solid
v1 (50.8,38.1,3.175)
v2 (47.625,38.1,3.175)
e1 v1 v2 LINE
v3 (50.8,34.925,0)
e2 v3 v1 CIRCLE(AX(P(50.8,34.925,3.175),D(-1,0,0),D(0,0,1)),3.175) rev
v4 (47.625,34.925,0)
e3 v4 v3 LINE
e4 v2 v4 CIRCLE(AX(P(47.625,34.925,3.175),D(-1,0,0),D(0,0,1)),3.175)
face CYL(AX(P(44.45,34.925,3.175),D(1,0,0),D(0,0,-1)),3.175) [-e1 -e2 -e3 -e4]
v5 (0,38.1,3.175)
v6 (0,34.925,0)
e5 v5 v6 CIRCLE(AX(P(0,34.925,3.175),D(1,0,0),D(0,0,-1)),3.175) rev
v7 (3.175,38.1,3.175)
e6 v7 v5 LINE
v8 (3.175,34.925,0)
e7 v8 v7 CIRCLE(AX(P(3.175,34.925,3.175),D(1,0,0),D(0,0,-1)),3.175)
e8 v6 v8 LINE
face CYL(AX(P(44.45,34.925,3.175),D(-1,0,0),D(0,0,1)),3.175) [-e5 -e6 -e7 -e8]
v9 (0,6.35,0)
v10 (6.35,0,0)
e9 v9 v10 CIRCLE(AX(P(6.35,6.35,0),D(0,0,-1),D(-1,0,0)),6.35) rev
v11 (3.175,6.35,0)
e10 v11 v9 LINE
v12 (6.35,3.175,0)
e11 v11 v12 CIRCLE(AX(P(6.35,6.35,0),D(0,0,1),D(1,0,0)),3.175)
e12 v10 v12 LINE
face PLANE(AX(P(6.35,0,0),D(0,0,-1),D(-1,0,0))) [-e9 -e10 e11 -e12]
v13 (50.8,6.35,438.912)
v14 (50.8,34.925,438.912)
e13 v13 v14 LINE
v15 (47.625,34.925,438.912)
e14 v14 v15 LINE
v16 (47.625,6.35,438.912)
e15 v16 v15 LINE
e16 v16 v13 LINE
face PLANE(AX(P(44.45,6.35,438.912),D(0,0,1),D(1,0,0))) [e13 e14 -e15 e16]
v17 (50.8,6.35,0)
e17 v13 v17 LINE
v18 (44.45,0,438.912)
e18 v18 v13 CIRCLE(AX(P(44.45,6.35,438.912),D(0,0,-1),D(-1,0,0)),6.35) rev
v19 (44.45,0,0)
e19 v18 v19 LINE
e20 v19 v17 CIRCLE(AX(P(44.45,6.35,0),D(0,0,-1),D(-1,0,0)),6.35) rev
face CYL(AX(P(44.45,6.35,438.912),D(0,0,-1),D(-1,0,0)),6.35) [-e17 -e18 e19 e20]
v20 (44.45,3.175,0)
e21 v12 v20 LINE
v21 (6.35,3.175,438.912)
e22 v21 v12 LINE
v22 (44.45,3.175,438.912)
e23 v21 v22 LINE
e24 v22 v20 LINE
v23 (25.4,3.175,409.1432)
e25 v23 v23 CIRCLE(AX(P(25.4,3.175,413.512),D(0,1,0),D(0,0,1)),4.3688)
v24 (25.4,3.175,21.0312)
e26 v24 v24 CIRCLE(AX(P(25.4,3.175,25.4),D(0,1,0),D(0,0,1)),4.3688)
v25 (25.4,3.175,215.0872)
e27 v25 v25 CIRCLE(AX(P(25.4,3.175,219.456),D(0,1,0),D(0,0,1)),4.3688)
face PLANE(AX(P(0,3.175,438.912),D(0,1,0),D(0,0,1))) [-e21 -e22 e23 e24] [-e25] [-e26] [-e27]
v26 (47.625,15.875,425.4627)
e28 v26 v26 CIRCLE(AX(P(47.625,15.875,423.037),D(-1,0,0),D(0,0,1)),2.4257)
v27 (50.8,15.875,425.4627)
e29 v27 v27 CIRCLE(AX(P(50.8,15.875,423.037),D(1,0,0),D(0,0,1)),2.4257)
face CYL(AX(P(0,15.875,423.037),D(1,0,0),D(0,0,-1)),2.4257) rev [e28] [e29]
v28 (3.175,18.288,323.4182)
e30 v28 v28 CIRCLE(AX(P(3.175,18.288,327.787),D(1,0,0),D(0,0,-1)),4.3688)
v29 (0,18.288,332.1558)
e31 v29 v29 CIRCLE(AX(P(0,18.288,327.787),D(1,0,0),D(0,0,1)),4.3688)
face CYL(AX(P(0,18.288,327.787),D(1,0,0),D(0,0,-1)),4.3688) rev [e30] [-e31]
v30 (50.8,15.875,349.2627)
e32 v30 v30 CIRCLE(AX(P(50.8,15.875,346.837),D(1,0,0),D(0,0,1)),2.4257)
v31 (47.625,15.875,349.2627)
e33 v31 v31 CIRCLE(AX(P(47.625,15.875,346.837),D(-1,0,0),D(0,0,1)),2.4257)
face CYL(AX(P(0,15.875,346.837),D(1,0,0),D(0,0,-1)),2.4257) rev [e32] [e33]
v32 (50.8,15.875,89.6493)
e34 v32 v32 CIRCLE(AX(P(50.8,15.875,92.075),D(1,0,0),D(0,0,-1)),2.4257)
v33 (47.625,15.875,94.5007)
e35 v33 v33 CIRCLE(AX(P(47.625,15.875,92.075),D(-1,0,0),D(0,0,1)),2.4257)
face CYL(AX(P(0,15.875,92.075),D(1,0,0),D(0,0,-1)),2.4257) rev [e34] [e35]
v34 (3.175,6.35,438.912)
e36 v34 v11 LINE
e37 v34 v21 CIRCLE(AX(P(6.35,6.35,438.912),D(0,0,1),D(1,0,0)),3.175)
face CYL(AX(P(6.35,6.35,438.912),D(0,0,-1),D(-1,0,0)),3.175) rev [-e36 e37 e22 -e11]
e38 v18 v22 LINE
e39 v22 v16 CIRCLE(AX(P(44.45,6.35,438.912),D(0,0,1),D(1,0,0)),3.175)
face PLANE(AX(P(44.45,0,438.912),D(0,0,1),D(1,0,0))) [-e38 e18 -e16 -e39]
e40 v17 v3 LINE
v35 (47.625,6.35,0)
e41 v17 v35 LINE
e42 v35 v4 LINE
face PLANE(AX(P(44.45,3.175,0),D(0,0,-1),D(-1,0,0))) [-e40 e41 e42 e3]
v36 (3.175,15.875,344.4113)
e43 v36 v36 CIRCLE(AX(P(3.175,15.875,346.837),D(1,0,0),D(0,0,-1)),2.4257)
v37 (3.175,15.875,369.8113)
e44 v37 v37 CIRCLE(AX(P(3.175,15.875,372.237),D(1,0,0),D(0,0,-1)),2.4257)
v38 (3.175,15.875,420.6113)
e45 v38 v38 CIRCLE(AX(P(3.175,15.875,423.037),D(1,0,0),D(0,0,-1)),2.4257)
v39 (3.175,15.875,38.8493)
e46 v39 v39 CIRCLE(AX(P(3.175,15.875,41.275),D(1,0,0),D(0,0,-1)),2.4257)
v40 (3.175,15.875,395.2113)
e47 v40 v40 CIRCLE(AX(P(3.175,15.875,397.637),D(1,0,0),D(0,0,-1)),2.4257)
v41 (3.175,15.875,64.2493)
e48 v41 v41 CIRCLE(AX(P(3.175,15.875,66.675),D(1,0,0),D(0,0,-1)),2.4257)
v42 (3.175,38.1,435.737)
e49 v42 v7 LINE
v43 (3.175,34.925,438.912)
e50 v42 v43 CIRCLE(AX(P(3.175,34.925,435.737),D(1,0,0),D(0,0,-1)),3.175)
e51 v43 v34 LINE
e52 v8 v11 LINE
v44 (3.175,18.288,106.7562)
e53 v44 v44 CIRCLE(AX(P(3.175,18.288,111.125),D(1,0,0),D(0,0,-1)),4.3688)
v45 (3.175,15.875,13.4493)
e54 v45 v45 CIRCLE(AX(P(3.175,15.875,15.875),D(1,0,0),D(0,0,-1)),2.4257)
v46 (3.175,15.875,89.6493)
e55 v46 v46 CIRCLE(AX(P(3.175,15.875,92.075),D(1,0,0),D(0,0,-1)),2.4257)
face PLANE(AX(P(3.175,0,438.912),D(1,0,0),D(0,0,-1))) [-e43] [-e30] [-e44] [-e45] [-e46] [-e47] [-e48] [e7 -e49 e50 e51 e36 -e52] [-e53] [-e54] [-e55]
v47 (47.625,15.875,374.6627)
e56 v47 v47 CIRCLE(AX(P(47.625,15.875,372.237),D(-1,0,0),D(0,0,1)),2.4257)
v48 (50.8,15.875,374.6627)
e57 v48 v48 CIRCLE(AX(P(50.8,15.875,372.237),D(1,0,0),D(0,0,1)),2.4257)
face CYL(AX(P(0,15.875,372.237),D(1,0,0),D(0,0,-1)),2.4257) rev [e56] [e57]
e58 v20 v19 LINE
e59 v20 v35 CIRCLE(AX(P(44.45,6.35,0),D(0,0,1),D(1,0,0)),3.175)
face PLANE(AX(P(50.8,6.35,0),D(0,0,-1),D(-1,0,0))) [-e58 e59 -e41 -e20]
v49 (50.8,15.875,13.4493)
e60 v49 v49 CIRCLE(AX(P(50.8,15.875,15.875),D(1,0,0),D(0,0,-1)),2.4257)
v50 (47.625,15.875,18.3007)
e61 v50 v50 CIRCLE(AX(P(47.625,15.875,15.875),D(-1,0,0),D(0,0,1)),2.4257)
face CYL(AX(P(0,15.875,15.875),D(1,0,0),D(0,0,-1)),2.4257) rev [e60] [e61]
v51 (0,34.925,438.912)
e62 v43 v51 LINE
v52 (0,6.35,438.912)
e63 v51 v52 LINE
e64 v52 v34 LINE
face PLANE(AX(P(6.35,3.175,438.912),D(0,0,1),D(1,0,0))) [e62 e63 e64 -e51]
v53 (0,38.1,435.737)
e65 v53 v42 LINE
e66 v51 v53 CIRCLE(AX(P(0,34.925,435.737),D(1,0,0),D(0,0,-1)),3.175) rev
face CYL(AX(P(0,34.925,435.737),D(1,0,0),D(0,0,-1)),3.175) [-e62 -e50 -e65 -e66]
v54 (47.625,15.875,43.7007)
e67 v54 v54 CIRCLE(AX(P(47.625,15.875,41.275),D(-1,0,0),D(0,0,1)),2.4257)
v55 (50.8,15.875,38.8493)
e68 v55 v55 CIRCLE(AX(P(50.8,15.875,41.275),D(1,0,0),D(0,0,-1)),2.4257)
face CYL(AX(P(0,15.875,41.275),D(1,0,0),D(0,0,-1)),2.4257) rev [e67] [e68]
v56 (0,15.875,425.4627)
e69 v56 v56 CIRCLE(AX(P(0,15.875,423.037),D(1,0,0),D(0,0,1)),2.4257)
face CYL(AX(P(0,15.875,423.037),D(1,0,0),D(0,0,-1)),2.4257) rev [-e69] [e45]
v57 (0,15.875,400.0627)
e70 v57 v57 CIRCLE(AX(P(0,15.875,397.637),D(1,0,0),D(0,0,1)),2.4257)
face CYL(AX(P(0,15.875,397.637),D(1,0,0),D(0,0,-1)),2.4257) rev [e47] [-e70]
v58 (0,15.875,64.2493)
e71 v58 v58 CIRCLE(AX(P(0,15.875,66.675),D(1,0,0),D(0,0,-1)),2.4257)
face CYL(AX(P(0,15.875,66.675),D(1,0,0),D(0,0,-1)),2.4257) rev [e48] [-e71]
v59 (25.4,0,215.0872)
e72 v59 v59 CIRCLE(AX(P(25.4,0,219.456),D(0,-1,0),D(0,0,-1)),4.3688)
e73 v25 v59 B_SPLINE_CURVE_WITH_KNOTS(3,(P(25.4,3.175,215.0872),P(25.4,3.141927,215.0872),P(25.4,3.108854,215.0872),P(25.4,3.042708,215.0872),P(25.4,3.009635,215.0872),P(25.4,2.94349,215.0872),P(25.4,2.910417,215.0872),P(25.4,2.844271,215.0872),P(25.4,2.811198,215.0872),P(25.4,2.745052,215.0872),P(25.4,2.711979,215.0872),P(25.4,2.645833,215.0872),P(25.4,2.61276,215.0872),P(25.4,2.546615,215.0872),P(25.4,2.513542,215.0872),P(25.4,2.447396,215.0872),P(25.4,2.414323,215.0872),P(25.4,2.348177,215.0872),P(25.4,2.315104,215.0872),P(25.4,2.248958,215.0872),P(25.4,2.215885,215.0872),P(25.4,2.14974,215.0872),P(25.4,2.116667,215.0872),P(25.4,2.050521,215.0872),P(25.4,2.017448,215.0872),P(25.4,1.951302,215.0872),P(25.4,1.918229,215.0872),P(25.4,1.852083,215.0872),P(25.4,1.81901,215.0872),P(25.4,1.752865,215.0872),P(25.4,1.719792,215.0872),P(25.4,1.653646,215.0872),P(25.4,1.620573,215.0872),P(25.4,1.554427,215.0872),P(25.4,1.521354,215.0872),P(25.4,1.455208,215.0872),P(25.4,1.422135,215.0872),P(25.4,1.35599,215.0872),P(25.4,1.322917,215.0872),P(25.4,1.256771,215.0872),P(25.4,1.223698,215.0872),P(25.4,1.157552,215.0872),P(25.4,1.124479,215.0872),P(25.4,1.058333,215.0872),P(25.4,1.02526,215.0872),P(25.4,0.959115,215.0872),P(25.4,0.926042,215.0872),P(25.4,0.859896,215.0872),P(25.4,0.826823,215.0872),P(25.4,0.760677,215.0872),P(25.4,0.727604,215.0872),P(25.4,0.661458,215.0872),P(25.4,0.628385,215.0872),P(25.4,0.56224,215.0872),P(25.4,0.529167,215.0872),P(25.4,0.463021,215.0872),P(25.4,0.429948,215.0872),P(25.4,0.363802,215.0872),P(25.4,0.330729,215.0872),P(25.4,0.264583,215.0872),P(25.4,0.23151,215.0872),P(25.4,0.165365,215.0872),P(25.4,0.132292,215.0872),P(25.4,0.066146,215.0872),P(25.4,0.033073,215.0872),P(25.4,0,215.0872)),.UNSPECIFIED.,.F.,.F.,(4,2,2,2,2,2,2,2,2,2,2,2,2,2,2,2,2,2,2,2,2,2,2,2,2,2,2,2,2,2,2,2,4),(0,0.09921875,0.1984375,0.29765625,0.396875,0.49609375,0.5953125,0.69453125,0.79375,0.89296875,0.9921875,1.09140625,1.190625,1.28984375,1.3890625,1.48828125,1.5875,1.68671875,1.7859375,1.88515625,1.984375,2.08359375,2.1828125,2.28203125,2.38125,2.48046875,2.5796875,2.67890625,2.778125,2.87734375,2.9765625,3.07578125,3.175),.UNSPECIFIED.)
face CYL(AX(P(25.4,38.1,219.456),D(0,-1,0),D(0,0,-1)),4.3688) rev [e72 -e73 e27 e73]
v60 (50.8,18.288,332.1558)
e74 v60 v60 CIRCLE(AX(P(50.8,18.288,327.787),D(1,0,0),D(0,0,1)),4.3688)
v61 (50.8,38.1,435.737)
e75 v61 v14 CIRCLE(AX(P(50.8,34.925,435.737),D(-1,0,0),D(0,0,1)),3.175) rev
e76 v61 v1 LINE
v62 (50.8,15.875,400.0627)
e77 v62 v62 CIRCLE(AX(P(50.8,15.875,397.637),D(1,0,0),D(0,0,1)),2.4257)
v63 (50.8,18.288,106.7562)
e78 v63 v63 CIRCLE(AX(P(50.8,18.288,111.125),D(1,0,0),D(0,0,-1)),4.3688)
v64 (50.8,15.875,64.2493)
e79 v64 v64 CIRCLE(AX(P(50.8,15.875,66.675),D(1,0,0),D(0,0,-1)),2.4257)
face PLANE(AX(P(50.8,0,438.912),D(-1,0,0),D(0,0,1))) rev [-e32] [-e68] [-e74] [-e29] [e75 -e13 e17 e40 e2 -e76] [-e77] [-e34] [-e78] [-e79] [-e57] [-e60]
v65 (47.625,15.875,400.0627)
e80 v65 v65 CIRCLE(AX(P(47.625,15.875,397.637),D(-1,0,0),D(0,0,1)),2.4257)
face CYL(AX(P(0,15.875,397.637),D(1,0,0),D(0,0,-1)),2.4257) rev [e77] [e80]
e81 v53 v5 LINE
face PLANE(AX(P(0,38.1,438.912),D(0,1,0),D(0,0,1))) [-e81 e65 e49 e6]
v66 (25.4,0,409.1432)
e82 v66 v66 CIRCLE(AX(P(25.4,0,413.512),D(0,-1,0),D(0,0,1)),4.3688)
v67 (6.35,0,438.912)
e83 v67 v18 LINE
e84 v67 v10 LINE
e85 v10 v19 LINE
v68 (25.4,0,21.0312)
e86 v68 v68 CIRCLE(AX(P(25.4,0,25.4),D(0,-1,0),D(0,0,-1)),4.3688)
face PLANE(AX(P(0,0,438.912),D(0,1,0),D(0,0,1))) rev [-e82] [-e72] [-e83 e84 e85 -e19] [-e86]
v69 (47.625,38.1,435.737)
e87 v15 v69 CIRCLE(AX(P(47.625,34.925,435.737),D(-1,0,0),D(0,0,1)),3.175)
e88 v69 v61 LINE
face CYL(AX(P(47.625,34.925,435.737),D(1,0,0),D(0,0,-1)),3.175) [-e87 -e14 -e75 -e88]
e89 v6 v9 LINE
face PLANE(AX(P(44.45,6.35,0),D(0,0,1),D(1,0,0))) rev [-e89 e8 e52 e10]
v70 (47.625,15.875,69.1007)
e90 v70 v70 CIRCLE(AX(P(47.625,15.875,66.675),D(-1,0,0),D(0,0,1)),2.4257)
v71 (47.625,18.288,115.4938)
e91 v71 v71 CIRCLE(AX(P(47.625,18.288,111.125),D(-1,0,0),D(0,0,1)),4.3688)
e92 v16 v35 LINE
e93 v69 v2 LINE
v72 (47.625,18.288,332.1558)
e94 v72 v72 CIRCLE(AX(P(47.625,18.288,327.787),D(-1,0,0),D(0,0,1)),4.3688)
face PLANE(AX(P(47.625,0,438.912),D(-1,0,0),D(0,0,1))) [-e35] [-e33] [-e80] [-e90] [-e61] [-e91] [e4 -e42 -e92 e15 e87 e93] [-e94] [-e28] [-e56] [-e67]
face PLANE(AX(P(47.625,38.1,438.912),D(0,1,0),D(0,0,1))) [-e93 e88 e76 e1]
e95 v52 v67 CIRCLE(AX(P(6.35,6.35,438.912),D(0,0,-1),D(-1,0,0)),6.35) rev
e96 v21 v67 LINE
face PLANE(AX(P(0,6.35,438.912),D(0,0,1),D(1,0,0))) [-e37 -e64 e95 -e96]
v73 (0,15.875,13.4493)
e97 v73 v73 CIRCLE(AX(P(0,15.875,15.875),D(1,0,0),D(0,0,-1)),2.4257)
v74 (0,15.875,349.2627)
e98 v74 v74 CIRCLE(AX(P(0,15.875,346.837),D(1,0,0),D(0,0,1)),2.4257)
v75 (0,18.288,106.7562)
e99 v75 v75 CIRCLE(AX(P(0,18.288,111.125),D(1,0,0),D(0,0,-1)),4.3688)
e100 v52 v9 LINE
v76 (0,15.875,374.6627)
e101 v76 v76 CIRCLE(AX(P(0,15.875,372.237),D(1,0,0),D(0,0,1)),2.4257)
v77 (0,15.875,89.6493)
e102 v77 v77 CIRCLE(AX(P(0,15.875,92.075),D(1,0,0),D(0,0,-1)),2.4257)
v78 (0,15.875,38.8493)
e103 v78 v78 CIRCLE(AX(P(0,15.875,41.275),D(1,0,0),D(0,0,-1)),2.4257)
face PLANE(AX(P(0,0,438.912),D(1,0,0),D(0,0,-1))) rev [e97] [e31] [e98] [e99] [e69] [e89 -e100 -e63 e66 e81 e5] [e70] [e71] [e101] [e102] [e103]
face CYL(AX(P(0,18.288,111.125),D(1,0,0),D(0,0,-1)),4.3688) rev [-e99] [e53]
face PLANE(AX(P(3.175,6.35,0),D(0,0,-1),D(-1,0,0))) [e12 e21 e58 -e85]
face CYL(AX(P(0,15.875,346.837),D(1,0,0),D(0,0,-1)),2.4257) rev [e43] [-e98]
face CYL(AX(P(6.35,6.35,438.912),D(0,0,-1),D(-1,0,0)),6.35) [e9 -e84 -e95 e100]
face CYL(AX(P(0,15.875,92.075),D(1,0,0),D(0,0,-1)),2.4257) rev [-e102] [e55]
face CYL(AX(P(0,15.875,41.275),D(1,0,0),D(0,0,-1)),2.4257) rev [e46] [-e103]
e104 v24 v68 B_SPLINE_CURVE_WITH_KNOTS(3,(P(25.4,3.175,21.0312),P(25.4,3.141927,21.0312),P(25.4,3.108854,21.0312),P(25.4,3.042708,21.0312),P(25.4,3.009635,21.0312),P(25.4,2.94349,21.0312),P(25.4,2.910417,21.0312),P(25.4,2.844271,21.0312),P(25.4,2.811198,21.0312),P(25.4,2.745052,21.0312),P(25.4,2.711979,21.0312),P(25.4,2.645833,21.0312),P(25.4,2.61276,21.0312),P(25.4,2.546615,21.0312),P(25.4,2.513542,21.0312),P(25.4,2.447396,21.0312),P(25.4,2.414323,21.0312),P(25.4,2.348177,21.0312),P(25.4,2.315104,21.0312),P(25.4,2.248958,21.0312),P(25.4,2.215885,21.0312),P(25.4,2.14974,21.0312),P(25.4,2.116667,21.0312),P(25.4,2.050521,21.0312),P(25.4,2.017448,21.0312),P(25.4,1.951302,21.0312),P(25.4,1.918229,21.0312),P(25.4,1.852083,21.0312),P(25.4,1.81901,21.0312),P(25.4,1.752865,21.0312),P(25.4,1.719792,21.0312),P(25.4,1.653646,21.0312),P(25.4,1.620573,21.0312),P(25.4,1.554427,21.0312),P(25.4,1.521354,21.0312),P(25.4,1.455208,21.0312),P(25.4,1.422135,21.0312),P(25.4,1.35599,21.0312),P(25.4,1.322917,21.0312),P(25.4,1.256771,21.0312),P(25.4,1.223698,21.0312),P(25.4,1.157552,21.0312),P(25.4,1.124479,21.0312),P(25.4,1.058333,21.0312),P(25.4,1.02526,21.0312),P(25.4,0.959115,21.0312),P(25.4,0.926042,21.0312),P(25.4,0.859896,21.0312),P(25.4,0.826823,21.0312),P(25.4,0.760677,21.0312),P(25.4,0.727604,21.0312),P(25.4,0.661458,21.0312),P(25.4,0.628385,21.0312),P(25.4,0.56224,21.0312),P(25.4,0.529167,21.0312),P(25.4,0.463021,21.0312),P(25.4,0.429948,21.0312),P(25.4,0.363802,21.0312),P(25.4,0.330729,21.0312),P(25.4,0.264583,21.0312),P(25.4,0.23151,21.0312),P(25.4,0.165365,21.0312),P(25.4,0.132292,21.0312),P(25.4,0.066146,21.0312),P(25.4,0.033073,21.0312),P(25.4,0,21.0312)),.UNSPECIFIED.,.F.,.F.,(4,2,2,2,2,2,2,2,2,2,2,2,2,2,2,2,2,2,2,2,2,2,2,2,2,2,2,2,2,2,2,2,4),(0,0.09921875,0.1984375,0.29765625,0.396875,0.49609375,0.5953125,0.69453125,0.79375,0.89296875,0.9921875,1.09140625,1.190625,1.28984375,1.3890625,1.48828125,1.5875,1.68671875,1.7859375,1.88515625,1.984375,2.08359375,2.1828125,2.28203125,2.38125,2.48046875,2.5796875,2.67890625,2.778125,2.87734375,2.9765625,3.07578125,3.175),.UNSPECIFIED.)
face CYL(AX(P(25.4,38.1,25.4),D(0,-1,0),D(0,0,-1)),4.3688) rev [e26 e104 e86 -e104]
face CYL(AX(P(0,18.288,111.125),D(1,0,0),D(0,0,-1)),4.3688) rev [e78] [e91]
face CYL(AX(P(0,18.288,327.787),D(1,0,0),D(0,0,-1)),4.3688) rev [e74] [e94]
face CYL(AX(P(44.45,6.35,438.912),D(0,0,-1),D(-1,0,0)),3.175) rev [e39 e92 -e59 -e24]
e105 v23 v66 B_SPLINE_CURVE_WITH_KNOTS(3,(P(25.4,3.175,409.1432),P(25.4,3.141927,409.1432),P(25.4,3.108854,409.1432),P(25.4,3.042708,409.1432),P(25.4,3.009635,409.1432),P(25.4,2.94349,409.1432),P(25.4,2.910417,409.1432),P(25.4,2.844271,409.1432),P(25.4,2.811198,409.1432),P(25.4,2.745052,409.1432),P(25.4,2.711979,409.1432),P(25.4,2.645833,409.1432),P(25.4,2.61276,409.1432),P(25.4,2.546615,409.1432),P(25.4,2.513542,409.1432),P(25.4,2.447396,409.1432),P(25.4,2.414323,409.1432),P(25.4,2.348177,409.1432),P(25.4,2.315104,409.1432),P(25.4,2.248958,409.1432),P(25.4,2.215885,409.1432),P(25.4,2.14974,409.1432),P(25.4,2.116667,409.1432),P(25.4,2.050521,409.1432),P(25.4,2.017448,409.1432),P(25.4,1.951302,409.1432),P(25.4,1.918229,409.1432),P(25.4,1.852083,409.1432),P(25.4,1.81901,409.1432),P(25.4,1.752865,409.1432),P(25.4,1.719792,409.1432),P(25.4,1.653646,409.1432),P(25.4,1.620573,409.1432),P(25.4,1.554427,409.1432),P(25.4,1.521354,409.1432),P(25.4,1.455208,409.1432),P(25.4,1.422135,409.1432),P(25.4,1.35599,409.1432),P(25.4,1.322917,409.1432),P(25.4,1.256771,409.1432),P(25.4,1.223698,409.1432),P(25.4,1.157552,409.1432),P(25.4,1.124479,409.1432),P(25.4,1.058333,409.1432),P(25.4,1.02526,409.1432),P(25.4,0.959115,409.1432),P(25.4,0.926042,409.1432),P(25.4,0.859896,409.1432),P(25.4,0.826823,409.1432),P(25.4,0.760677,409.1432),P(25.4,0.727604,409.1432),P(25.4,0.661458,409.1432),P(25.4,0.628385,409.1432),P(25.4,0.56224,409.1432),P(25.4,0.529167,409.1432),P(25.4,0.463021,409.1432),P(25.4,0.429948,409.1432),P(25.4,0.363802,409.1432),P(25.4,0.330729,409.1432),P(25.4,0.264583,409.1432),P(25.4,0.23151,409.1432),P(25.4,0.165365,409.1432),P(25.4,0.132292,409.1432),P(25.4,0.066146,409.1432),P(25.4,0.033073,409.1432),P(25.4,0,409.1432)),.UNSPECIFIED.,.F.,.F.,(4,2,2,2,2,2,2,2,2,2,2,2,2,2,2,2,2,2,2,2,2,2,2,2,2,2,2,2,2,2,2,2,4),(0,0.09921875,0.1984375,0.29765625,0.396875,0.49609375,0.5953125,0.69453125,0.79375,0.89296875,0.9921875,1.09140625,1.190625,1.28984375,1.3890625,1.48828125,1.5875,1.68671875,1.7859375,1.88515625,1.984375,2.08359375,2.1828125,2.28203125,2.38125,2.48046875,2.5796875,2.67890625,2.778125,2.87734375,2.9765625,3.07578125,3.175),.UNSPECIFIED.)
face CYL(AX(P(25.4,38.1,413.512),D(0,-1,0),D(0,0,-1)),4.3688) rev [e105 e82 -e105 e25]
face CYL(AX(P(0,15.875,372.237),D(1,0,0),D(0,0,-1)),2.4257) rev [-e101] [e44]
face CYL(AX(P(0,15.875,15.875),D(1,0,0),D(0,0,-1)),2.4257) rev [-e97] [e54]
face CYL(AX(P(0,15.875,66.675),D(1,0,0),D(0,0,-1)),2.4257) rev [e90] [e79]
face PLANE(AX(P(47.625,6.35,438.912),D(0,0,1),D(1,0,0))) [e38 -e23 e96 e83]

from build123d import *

# Parameters (mm, degrees)
BASE_FLANGE1_DEPTH = 438.912
SKETCH6_R          = 2.4257
CUT_EXTRUDE1_DEPTH = 444.481672388
SKETCH7_R          = 4.3688
CUT_EXTRUDE2_DEPTH = 444.481672388
SKETCH8_R          = 4.3688
CUT_EXTRUDE3_DEPTH = 444.481672388
FILLET1_R          = 3.175


# Sheet-metal steps are written as plain solids
with BuildPart() as part:
    # Sketch1 → Base-Flange1 (new body)
    with BuildSketch(Plane.XY):
        with BuildLine():
            Line((50.8, 38.1), (50.8, 6.35))
            ThreePointArc((50.8, 6.35), (48.940128061, 1.859871939), (44.45, 0))
            Line((44.45, 0), (6.35, 0))
            ThreePointArc((6.35, 0), (1.859871939, 1.859871939), (0, 6.35))
            Line((0, 6.35), (0, 38.1))
            Line((0, 38.1), (3.175, 38.1))
            Line((3.175, 38.1), (3.175, 6.35))
            ThreePointArc((3.175, 6.35), (4.10493597, 4.10493597), (6.35, 3.175))
            Line((6.35, 3.175), (44.45, 3.175))
            ThreePointArc((44.45, 3.175), (46.69506403, 4.10493597), (47.625, 6.35))
            Line((47.625, 6.35), (47.625, 38.1))
            Line((47.625, 38.1), (50.8, 38.1))
        make_face()
    extrude(amount=BASE_FLANGE1_DEPTH)

    # Sketch6 → Cut-Extrude1 (cut, through all)
    with BuildSketch(Plane(origin=(50.8, 0, 0), x_dir=(0, 0, -1), z_dir=(1, 0, 0))):
        with Locations((-15.875, 15.875)):
            Circle(SKETCH6_R)
        with Locations((-41.275, 15.875)):
            Circle(SKETCH6_R)
        with Locations((-66.675, 15.875)):
            Circle(SKETCH6_R)
        with Locations((-372.237, 15.875)):
            Circle(SKETCH6_R)
        with Locations((-397.637, 15.875)):
            Circle(SKETCH6_R)
        with Locations((-423.037, 15.875)):
            Circle(SKETCH6_R)
        with Locations((-92.075, 15.875)):
            Circle(SKETCH6_R)
        with Locations((-346.837, 15.875)):
            Circle(SKETCH6_R)
    extrude(amount=-CUT_EXTRUDE1_DEPTH, mode=Mode.SUBTRACT)

    # Sketch7 → Cut-Extrude2 (cut, through all)
    with BuildSketch(Plane.XZ):
        with Locations(Location((25.4, 219.456, 0), (0, 0, 270))):
            Circle(SKETCH7_R)
        with Locations(Location((25.4, 25.4, 0), (0, 0, 270))):
            Circle(SKETCH7_R)
        with Locations(Location((25.4, 413.512, 0), (0, 0, 270))):
            Circle(SKETCH7_R)
    extrude(amount=-CUT_EXTRUDE2_DEPTH, mode=Mode.SUBTRACT)

    # Sketch8 → Cut-Extrude3 (cut, through all)
    with BuildSketch(Plane(origin=(50.8, 0, 0), x_dir=(0, 0, -1), z_dir=(1, 0, 0))):
        with Locations((-111.125, 18.288)):
            Circle(SKETCH8_R)
        with Locations((-327.787, 18.288)):
            Circle(SKETCH8_R)
    extrude(amount=-CUT_EXTRUDE3_DEPTH, mode=Mode.SUBTRACT)

    # Fillet1
    fillet1_edges = [part.edges().sort_by_distance(p)[0] for p in [
        (1.5875, 38.1, 0),
        (49.2125, 38.1, 0),
        (1.5875, 38.1, 438.912),
        (49.2125, 38.1, 438.912),
    ]]
    fillet(fillet1_edges, radius=FILLET1_R)


solid = part.part
